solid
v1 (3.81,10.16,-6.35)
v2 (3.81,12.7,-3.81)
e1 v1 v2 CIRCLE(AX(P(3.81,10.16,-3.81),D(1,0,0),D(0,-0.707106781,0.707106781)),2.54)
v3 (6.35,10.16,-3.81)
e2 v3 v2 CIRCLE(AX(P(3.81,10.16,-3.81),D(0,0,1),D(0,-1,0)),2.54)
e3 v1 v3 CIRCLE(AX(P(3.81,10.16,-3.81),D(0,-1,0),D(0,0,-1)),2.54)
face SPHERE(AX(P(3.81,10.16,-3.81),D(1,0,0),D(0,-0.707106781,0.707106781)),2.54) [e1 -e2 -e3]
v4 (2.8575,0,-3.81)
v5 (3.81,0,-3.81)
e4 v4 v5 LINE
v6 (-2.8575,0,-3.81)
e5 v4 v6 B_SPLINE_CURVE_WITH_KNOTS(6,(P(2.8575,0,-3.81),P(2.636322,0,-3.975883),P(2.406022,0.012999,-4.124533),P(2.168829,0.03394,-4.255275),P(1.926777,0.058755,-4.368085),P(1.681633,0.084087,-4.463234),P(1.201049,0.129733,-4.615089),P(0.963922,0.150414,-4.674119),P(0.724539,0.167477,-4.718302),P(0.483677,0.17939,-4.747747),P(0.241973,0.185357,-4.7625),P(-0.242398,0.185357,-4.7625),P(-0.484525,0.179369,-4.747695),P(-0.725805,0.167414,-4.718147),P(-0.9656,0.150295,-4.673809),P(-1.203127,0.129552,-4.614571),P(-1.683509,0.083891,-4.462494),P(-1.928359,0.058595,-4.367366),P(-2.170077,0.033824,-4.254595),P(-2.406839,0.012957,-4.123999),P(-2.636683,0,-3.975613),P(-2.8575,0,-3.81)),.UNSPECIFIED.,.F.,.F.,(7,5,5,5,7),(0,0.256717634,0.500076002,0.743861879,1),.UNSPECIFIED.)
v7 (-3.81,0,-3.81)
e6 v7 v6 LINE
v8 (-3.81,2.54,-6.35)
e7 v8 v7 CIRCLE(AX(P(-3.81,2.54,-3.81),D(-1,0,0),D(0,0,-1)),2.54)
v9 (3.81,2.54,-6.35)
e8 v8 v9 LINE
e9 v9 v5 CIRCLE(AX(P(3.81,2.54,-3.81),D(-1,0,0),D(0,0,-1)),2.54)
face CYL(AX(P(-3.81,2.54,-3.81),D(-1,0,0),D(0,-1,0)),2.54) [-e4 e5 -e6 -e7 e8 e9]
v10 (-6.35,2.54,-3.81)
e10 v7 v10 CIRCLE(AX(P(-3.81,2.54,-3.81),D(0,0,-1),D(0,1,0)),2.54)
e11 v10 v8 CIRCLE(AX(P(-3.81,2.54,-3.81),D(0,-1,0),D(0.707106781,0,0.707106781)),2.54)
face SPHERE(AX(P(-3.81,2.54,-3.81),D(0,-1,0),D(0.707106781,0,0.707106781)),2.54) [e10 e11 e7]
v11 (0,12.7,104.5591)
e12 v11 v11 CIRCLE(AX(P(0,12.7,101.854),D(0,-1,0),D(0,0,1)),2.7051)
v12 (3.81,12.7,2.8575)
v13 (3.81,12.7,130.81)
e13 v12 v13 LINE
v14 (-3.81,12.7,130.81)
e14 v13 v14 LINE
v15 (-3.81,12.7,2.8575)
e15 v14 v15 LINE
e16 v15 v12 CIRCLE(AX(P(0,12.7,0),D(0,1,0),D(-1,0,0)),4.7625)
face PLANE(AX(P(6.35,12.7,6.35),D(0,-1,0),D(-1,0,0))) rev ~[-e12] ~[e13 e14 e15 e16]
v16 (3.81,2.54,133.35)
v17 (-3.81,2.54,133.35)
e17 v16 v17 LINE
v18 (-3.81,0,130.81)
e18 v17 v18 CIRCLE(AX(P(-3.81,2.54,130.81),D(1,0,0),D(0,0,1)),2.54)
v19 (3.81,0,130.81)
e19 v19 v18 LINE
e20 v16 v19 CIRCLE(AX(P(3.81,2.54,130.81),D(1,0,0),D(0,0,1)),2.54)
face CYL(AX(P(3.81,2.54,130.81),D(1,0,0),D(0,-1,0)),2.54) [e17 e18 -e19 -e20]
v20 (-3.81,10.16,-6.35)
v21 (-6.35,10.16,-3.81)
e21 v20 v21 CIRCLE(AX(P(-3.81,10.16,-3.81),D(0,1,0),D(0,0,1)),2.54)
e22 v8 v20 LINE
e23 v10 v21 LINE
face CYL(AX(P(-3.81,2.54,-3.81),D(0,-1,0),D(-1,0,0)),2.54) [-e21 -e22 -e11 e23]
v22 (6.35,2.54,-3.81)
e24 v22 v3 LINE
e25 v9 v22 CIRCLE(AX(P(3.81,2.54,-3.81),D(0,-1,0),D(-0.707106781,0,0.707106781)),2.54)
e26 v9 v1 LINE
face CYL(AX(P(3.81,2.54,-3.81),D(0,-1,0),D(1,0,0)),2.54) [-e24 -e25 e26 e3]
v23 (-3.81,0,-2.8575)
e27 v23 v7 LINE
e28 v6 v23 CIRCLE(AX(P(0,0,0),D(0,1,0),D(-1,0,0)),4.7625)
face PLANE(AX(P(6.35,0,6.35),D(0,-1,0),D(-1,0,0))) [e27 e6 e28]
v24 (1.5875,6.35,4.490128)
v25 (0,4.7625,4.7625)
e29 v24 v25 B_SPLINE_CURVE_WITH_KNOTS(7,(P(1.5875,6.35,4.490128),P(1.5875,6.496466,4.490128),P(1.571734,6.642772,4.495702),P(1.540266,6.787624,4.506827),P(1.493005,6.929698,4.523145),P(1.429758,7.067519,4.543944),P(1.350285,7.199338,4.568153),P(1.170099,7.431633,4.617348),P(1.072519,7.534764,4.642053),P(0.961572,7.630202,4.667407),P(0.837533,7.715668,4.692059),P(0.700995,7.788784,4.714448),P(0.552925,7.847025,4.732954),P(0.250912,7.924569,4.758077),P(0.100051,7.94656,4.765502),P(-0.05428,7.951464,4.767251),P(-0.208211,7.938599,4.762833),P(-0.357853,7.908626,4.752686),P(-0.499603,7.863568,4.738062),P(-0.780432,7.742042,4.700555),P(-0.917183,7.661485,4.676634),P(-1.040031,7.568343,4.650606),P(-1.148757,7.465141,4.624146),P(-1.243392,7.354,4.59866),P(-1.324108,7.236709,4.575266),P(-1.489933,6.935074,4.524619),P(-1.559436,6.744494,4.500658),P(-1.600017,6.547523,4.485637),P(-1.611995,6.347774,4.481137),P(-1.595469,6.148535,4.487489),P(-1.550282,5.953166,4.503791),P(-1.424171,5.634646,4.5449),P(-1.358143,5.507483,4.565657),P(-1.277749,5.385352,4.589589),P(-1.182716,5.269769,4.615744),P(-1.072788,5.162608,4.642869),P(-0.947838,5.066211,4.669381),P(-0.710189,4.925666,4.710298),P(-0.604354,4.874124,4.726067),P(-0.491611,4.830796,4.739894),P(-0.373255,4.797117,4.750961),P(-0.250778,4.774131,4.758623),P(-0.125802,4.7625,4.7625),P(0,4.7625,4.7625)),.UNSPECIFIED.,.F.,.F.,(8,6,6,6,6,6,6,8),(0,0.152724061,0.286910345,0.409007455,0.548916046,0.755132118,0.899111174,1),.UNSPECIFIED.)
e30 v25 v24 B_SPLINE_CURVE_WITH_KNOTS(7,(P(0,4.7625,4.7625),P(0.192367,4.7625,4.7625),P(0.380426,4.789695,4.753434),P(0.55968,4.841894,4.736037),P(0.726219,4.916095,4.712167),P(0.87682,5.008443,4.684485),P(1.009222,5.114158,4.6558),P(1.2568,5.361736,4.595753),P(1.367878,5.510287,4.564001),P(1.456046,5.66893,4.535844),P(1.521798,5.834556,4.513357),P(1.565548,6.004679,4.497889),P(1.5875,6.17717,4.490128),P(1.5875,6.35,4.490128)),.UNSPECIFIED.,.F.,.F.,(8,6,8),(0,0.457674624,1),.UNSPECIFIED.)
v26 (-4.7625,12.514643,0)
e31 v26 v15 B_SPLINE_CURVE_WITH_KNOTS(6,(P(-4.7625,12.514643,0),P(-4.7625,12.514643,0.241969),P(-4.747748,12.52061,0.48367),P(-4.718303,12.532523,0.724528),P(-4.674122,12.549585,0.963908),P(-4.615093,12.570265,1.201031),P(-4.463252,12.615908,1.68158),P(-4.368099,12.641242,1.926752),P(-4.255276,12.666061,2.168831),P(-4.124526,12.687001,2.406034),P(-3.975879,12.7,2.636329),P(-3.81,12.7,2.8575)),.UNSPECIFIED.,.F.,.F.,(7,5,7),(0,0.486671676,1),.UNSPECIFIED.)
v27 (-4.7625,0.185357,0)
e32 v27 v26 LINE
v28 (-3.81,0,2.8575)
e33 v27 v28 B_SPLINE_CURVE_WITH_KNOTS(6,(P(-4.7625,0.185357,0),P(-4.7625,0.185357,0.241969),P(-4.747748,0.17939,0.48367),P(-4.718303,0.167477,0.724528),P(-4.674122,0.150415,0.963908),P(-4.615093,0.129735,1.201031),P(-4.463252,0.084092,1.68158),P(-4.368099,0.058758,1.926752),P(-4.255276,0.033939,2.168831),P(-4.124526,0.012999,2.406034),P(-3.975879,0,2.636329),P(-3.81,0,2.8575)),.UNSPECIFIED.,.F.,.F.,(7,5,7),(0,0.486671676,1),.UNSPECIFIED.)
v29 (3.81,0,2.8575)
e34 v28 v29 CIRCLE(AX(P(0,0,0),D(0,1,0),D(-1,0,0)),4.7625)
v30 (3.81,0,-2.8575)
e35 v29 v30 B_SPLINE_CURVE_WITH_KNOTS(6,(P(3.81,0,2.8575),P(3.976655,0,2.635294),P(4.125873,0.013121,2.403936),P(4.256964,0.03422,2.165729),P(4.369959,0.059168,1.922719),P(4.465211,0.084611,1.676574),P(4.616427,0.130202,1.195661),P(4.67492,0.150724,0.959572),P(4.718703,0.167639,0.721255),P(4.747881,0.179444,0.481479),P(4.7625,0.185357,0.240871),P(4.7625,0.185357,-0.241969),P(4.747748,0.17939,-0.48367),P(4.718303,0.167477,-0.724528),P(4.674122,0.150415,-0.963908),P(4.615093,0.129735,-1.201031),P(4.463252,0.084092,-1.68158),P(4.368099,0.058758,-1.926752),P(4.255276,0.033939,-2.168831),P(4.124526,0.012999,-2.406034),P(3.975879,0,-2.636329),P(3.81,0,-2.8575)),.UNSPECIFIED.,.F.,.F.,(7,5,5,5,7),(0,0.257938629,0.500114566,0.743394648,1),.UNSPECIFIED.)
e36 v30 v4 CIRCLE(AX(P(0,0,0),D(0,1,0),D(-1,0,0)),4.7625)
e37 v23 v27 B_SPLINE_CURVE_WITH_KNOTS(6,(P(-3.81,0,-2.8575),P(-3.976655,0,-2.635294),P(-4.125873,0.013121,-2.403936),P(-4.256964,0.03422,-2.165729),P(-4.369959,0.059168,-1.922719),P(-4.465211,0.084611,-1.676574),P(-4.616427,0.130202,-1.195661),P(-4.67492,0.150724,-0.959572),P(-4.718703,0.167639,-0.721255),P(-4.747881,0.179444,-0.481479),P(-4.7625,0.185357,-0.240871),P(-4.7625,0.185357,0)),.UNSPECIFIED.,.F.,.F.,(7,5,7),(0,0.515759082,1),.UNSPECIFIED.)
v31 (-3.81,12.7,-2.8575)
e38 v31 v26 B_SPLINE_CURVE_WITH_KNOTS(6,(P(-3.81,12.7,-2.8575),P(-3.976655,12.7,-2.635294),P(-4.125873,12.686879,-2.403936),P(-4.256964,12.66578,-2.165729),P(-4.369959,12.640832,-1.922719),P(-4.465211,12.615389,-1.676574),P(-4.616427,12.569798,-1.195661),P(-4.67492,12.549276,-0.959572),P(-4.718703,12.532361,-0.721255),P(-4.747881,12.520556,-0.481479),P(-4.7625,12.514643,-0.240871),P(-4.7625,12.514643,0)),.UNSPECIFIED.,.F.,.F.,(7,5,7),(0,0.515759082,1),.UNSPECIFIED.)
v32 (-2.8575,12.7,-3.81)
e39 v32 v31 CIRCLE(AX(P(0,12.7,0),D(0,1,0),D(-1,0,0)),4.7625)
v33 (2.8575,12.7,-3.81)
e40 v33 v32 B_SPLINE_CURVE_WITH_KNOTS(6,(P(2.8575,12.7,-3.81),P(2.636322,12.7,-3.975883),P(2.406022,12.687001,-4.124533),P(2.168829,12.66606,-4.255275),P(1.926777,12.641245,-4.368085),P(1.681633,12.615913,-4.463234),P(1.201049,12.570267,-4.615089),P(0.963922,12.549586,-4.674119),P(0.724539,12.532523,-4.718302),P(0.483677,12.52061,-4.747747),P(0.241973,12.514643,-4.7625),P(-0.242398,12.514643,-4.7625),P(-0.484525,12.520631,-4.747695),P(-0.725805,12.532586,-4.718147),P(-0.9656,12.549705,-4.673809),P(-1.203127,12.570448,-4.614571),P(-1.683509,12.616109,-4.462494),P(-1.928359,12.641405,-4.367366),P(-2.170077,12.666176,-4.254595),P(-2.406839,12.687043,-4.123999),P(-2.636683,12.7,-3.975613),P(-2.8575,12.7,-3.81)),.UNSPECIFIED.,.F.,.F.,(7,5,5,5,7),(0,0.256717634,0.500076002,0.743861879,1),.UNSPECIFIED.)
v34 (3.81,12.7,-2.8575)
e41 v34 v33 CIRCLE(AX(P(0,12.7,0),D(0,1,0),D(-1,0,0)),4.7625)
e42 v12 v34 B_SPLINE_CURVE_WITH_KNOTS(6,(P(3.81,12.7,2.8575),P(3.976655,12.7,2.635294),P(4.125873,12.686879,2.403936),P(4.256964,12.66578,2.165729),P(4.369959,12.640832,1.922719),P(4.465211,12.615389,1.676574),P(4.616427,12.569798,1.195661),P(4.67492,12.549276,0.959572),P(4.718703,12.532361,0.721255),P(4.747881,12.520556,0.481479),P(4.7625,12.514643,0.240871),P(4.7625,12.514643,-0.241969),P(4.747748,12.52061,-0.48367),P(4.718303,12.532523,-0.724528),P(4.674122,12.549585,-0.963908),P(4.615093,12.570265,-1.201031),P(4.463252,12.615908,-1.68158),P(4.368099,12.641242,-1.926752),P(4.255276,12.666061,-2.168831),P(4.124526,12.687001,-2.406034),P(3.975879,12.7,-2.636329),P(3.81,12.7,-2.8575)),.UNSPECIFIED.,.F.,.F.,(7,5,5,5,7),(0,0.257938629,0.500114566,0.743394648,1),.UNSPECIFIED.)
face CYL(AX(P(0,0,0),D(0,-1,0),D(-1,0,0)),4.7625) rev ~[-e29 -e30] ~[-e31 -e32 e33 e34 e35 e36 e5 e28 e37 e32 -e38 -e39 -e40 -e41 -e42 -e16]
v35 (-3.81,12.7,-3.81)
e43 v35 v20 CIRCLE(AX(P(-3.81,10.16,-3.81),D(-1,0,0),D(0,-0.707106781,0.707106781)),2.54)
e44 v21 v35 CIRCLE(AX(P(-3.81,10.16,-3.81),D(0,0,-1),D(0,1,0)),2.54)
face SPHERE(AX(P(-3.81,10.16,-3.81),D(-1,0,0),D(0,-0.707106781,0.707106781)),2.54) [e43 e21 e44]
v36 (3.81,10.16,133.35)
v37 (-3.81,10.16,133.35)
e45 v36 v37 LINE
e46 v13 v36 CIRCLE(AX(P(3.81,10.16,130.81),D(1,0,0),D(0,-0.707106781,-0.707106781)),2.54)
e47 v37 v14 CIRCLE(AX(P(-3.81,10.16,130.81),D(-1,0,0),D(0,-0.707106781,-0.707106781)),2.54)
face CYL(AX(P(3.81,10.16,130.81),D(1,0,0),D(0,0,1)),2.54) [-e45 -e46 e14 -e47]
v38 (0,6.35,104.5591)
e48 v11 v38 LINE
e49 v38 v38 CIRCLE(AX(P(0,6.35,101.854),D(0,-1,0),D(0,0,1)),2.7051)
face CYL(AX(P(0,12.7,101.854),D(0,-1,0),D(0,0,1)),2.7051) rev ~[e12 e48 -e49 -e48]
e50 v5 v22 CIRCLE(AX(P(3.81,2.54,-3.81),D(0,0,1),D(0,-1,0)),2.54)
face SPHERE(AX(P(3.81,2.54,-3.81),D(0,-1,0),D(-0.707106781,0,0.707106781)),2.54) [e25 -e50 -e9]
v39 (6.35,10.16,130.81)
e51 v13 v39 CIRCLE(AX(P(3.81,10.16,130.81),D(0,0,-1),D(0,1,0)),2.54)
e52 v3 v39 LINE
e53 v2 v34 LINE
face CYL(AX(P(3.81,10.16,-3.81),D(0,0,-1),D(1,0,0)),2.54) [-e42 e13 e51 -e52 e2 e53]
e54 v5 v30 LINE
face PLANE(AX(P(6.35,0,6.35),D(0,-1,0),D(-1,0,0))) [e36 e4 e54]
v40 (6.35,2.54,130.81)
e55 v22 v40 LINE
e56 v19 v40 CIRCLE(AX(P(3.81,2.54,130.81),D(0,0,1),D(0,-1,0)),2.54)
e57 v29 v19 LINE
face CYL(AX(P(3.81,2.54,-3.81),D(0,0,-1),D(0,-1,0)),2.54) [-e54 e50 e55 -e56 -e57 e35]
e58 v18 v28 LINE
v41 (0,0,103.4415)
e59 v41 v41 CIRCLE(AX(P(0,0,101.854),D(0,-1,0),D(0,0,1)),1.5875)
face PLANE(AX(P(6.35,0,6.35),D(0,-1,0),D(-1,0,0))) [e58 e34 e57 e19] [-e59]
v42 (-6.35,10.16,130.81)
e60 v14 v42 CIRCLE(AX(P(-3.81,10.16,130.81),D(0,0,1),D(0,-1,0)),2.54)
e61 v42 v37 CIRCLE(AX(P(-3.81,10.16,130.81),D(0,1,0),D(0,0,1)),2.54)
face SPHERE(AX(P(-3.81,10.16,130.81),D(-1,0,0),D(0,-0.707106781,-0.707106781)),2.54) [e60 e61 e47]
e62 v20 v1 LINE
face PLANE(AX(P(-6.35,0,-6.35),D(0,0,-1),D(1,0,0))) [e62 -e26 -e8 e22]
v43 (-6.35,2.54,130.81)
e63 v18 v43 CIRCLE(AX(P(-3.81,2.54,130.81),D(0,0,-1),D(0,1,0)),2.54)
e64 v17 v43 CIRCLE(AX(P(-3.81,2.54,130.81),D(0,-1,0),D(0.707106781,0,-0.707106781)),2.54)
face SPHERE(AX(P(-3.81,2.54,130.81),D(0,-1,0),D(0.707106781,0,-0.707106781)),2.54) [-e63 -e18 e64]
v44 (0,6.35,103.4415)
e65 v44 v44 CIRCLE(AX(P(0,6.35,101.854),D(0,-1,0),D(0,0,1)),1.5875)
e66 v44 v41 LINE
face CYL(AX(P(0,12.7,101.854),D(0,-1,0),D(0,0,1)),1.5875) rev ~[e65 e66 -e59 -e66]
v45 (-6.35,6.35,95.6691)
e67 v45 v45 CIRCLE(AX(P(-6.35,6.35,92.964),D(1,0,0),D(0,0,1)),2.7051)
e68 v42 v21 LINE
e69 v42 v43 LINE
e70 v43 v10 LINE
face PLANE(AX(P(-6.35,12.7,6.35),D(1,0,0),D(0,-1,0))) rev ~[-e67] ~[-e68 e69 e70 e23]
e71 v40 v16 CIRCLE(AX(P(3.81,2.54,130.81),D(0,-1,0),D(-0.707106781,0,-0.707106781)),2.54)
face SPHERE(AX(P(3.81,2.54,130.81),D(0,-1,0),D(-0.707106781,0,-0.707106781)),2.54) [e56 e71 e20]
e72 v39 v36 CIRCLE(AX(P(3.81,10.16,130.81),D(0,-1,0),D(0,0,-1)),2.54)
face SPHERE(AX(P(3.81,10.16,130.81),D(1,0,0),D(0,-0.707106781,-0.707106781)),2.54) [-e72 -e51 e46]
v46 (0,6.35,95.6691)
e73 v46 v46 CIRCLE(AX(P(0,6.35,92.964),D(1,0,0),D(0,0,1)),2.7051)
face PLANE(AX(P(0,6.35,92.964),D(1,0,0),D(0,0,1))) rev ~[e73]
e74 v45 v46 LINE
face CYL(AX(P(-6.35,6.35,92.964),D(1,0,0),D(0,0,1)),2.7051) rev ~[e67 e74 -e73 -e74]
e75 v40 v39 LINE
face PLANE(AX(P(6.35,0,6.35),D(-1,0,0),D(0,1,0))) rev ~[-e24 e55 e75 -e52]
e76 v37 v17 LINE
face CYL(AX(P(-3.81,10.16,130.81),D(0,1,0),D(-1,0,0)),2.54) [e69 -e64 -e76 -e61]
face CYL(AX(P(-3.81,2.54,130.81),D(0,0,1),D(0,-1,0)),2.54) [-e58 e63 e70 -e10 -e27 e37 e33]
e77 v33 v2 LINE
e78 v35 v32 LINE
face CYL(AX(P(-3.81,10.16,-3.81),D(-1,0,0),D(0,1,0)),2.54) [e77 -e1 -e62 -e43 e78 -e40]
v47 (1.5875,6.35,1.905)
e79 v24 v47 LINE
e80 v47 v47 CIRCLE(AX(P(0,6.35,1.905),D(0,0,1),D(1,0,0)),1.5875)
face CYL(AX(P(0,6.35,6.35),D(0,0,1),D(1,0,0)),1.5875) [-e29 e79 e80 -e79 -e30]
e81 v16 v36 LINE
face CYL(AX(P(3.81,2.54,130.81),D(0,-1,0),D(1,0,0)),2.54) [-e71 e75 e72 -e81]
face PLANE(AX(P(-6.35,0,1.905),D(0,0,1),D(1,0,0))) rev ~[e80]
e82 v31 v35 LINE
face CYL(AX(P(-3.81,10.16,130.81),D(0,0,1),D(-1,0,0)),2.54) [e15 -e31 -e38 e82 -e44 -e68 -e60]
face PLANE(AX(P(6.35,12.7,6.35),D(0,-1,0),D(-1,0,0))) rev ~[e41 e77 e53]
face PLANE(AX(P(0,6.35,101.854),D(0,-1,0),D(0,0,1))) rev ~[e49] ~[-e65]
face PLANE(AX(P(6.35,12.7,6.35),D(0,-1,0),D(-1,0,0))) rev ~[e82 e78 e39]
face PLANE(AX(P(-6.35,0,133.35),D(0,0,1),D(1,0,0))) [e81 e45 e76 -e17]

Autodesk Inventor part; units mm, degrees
ref_plane "YZ Plane" through (0, 0, 0) normal (1, 0, 0) x (0, 1, 0)
ref_plane "XZ Plane" through (0, 0, 0) normal (0, 1, 0) x (-1, 0, 0)
ref_plane "XY Plane" through (0, 0, 0) normal (0, 0, 1) x (1, 0, 0)
sketch "Sketch1" plane through (0, 0, 0) normal (0, 1, 0) x (-1, 0, 0)
  line L0 (-6.35, 6.35) -> (6.35, 6.35)
  line L1 (6.35, 6.35) -> (6.35, -6.35)
  line L2 (6.35, -6.35) -> (-6.35, -6.35)
  line L3 (-6.35, -6.35) -> (-6.35, 6.35)
  line L4 (-6.35, 6.35) -> (6.35, -6.35) construction
  line L5 (6.35, 6.35) -> (-6.35, -6.35) construction
  circle A0 centre (0, 0) radius 4.7625
  dimension "d0" = 12.7
  dimension "d1" = 12.7
  dimension "d2" = 9.525
extrude "Extrusion1" add sketch "Sketch1" along normal blind 12.7
sketch "Sketch2" plane through (-6.35, 0, 6.35) normal (0, 0, 1) x (1, 0, 0)
  line L0 (6.35, 0) -> (6.35, 6.35)
  circle A0 centre (6.35, 6.35) radius 1.5875
  dimension "d5" = 6.35
  dimension "d6" = 3.175
extrude "Extrusion2" add sketch "Sketch2" against normal blind 4.445
sketch "Sketch3" plane through (-6.35, 0, 6.35) normal (0, 0, 1) x (1, 0, 0)
  line L0 (12.7, 0) -> (0, 0) projected
  line L1 (12.7, 0) -> (12.7, 12.7) projected
  line L2 (0, 0) -> (12.7, 0)
  line L3 (12.7, 0) -> (12.7, 12.7)
  line L4 (12.7, 12.7) -> (0, 12.7)
  line L5 (0, 12.7) -> (0, 0)
  point P0 (6.35, 0)
extrude "Extrusion3" add sketch "Sketch3" along normal blind 127
fillet "Fillet1" radius 2.54 12 edges at (6.35, 12.7, 63.5) (6.35, 0, 63.5) (-6.35, 12.7, 63.5) (-6.35, 0, 63.5) (-6.35, 6.35, 133.35) (0, 0, 133.35) (6.35, 6.35, 133.35) (0, 12.7, 133.35) (-6.35, 6.35, -6.35) (6.35, 6.35, -6.35) (0, 12.7, -6.35) (0, 0, -6.35)
sketch "Sketch4" plane through (0, 12.7, 0) normal (0, 1, 0) x (1, 0, 0)
  line L0 (0, 0) -> (0, -101.854)
  line L1 (0, 0) -> (101.854, 0) construction
  dimension "d12" = 101.854
  dimension "d13" = 90
hole "Hole1" at (0, 12.7, 101.854) direction (0, -1, 0) diameter 5.4102 depth 6.35
hole "Hole2" at (0, 12.7, 101.854) direction (0, -1, 0) diameter 3.175 depth 25.4 tip angle 118
sketch "Sketch5" plane through (-6.35, 2.54, -3.81) normal (-1, 0, 0) x (0, 0, 1)
  line L0 (3.81, -2.54) -> (96.774, -2.54)
  line L1 (3.81, -2.54) -> (96.774, -2.54) construction
  line L2 (96.774, -2.54) -> (96.774, 3.81)
  line L3 (134.62, 0) -> (0, 0) projected
  line L4 (96.774, -2.54) -> (103.124, -2.54) construction
  point P0 (3.81, 10.16)
  dimension "d28" = 92.964
  dimension "d29" = 0
  dimension "d30" = 6.35
  dimension "d31" = 90
hole "Hole3" at (-6.35, 6.35, 92.964) direction (1, 0, 0) diameter 5.4102 depth 6.35
properties part number "spincoater dispense arm"
